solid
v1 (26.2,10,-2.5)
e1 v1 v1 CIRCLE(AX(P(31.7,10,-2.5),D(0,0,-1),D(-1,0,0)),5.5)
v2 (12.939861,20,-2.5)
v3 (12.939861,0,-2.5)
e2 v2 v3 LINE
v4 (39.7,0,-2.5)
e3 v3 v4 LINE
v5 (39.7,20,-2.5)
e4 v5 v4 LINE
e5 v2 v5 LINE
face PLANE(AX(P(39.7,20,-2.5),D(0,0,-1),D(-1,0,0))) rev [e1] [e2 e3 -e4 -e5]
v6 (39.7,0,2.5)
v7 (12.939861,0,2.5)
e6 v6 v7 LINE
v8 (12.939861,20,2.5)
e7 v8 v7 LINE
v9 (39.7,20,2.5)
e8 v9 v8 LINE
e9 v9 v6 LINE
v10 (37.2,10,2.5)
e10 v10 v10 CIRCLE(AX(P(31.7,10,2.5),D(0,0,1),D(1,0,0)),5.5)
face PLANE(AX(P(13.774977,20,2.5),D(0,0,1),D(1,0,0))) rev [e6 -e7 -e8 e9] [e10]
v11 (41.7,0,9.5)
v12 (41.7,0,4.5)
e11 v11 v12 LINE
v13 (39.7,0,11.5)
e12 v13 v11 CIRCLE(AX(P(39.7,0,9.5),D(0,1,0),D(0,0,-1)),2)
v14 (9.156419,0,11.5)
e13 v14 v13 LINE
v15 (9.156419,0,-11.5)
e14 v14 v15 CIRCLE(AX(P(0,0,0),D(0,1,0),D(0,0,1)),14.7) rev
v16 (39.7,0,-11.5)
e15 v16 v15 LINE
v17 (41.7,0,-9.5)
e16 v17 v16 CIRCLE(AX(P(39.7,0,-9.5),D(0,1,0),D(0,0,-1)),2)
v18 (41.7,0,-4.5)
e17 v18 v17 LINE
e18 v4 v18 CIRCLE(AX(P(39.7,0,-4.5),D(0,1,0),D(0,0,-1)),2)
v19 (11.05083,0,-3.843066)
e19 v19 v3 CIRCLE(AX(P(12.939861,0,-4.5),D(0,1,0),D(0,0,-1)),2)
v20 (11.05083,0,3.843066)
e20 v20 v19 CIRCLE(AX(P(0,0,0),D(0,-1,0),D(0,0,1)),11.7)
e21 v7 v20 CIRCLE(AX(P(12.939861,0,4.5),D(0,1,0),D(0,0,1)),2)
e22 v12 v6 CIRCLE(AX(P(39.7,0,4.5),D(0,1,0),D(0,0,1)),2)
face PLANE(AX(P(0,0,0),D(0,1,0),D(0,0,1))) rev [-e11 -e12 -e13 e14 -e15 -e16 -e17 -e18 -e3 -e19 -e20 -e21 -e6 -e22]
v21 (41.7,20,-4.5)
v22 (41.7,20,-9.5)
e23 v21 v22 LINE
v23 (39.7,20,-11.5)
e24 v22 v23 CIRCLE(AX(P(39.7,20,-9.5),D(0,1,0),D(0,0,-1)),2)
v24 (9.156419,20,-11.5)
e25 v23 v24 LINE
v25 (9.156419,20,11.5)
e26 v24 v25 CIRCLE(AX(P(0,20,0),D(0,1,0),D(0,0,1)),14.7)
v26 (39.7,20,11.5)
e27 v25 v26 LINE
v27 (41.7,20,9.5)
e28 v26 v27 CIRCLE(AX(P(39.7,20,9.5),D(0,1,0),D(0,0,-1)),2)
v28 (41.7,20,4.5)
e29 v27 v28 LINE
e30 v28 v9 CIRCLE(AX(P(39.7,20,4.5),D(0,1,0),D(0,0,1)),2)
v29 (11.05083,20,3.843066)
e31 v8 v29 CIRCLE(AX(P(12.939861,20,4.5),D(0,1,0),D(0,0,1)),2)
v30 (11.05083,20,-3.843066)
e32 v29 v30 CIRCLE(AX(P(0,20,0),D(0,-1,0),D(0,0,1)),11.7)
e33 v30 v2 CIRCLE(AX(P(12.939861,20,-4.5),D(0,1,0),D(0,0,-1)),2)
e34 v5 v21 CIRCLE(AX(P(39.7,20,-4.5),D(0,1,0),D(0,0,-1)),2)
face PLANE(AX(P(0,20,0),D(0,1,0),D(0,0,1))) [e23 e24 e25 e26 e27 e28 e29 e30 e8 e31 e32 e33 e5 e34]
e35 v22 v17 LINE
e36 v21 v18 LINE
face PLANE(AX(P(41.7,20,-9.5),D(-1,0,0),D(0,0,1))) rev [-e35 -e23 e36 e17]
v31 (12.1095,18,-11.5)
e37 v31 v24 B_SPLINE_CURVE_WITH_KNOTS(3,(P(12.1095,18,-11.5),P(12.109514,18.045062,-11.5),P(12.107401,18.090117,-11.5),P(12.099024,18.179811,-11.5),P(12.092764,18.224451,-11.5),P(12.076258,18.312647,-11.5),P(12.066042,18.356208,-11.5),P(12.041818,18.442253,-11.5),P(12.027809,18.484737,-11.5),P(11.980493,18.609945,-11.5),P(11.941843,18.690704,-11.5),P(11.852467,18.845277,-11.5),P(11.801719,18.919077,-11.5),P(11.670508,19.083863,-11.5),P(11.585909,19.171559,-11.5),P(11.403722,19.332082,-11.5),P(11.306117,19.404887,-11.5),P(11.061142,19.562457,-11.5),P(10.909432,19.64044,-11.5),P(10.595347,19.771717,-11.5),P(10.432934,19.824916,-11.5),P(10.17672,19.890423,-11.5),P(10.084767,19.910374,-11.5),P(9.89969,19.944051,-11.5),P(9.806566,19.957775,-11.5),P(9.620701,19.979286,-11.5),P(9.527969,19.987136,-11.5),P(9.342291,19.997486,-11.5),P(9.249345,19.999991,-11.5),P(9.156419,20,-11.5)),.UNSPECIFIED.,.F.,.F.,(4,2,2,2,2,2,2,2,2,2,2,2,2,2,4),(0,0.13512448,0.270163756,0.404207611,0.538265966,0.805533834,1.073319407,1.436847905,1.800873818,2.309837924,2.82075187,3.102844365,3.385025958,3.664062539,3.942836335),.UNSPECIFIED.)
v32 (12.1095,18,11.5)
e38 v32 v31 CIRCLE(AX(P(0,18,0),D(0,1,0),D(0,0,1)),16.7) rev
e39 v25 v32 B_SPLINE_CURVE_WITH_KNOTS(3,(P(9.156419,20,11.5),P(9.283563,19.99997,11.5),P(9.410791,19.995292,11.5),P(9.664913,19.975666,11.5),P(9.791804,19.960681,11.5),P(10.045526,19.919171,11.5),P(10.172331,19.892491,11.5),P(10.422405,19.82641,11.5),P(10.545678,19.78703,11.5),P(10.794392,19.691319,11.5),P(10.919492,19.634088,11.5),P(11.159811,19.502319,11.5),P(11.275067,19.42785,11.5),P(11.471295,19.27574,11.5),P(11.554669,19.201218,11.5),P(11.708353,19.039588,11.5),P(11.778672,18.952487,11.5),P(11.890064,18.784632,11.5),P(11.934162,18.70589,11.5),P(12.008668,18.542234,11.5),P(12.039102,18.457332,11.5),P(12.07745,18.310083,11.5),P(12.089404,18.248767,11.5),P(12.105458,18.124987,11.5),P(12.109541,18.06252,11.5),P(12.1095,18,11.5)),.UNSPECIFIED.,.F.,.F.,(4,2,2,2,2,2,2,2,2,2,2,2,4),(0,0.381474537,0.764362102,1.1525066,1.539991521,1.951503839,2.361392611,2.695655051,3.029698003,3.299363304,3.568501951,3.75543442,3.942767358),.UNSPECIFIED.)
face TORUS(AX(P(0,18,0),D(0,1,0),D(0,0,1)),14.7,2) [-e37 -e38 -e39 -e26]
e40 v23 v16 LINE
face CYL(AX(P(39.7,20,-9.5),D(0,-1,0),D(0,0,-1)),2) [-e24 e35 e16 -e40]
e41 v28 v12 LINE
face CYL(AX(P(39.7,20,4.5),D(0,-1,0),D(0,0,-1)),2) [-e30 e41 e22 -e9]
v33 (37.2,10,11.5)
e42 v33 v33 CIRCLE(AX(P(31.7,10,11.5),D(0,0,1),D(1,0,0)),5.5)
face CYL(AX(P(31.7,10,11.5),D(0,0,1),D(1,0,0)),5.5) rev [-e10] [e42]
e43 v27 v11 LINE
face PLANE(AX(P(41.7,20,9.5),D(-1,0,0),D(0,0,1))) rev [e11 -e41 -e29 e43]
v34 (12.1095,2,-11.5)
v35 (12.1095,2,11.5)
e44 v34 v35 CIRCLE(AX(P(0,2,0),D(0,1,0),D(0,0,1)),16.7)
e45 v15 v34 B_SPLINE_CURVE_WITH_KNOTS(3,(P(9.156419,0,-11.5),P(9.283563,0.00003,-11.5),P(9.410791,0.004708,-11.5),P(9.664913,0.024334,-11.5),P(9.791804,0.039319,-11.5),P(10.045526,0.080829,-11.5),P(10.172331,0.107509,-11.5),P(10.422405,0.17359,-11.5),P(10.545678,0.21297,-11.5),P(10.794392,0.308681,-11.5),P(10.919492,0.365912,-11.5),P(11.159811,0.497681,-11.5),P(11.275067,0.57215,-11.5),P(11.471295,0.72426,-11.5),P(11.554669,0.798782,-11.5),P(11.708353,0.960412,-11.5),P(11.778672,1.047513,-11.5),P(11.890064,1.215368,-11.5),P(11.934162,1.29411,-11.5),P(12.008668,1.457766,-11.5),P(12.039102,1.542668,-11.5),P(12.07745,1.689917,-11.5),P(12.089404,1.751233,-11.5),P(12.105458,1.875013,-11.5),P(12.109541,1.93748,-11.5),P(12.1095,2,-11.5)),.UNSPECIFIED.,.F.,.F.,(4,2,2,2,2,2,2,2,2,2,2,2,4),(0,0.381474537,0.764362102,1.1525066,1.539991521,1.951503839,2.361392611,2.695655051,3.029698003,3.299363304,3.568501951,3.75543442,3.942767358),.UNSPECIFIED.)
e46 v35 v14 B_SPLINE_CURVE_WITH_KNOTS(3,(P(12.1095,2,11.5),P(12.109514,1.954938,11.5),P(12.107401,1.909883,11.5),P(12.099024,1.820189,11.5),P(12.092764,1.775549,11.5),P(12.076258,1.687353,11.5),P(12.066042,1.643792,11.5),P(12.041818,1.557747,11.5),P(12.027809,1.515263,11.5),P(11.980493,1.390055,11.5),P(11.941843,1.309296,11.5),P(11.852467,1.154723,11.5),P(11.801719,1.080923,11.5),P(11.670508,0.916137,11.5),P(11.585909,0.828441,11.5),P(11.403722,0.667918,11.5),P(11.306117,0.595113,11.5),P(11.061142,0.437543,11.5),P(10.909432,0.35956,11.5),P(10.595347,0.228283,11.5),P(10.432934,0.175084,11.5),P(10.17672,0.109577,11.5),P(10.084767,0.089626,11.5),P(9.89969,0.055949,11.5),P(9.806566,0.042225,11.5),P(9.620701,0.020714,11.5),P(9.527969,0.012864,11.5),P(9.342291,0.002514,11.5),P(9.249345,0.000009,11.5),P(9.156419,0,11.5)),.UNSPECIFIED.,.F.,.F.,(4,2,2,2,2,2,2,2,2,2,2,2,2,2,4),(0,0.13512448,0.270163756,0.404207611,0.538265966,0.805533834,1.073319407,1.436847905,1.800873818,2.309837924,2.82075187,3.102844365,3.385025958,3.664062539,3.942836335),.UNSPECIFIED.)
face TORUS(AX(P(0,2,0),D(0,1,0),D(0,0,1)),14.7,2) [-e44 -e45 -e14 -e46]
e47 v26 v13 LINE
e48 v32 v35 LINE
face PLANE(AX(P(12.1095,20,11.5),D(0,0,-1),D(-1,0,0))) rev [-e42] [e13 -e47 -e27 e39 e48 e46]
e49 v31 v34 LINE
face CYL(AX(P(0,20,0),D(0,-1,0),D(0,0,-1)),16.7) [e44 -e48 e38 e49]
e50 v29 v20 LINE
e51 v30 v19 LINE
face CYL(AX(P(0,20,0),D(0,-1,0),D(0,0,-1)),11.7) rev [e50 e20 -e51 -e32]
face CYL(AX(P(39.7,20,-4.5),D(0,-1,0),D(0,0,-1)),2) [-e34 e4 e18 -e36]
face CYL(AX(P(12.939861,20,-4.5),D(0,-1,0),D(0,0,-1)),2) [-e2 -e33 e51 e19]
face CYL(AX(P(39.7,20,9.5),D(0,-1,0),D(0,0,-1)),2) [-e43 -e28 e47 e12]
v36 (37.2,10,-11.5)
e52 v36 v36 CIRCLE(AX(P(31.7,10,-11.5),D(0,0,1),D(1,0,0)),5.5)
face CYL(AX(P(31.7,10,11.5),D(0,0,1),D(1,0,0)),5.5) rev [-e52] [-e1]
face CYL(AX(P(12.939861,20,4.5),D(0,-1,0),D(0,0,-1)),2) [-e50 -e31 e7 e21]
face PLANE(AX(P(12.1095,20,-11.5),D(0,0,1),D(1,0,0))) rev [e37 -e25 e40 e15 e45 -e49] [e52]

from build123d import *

# Parameters (mm, degrees)
DODANIE_WYCI_GNI_CIE1_DEPTH  = 20
ZAAWANSOWANYOTW_R1_START     = -11.5
ZAAWANSOWANYOTW_R1_OUTLINE_R = 5.5
ZAAWANSOWANYOTW_R1_DEPTH     = 23
ZAOKR_GLENIE3_R              = 2


# Read off the part's stored shape, not the designer's step: ZaawansowanyOtwór1
with BuildPart() as part:
    # Szkic1 → Dodanie-wyciągnięcie1 (new body)
    with BuildSketch(Plane(origin=(0, 0, 0), x_dir=(1, 0, 0), z_dir=(0, 1, 0))):
        with BuildLine():
            Line((12.109500403, 11.5), (39.7, 11.5))
            ThreePointArc((39.7, 11.5), (41.114213562, 10.914213562), (41.7, 9.5))
            Line((41.7, 9.5), (41.7, 4.5))
            ThreePointArc((41.7, 4.5), (41.114213562, 3.085786438), (39.7, 2.5))
            Line((39.7, 2.5), (13.774977314, 2.5))
            Line((13.774977314, 2.5), (12.939860896, 2.5))
            ThreePointArc((12.939860896, 2.5), (11.780953784, 2.869989477), (11.050830108, 3.843065693))
            ThreePointArc((11.050830108, 3.843065693), (-11.7, 0), (11.050830108, -3.843065693))
            ThreePointArc((11.050830108, -3.843065693), (11.780953784, -2.869989477), (12.939860896, -2.5))
            Line((12.939860896, -2.5), (13.774977314, -2.5))
            Line((13.774977314, -2.5), (39.7, -2.5))
            ThreePointArc((39.7, -2.5), (41.114213562, -3.085786438), (41.7, -4.5))
            Line((41.7, -4.5), (41.7, -9.5))
            ThreePointArc((41.7, -9.5), (41.114213562, -10.914213562), (39.7, -11.5))
            Line((39.7, -11.5), (12.109500403, -11.5))
            ThreePointArc((12.109500403, -11.5), (-16.7, 0), (12.109500403, 11.5))
        make_face()
    extrude(amount=DODANIE_WYCI_GNI_CIE1_DEPTH)

    # ZaawansowanyOtwór1 outline → ZaawansowanyOtwór1 (cut)
    with BuildSketch(Plane.XY.offset(ZAAWANSOWANYOTW_R1_START)):
        with Locations((31.7, 10)):
            Circle(ZAAWANSOWANYOTW_R1_OUTLINE_R)
    extrude(amount=ZAAWANSOWANYOTW_R1_DEPTH, mode=Mode.SUBTRACT)

    # Zaokrąglenie3
    zaokr_glenie3_edges = [part.edges().sort_by_distance(p)[0] for p in [
        (-16.7, 0, 0),
        (-16.7, 20, 0),
    ]]
    fillet(zaokr_glenie3_edges, radius=ZAOKR_GLENIE3_R)


solid = part.part
